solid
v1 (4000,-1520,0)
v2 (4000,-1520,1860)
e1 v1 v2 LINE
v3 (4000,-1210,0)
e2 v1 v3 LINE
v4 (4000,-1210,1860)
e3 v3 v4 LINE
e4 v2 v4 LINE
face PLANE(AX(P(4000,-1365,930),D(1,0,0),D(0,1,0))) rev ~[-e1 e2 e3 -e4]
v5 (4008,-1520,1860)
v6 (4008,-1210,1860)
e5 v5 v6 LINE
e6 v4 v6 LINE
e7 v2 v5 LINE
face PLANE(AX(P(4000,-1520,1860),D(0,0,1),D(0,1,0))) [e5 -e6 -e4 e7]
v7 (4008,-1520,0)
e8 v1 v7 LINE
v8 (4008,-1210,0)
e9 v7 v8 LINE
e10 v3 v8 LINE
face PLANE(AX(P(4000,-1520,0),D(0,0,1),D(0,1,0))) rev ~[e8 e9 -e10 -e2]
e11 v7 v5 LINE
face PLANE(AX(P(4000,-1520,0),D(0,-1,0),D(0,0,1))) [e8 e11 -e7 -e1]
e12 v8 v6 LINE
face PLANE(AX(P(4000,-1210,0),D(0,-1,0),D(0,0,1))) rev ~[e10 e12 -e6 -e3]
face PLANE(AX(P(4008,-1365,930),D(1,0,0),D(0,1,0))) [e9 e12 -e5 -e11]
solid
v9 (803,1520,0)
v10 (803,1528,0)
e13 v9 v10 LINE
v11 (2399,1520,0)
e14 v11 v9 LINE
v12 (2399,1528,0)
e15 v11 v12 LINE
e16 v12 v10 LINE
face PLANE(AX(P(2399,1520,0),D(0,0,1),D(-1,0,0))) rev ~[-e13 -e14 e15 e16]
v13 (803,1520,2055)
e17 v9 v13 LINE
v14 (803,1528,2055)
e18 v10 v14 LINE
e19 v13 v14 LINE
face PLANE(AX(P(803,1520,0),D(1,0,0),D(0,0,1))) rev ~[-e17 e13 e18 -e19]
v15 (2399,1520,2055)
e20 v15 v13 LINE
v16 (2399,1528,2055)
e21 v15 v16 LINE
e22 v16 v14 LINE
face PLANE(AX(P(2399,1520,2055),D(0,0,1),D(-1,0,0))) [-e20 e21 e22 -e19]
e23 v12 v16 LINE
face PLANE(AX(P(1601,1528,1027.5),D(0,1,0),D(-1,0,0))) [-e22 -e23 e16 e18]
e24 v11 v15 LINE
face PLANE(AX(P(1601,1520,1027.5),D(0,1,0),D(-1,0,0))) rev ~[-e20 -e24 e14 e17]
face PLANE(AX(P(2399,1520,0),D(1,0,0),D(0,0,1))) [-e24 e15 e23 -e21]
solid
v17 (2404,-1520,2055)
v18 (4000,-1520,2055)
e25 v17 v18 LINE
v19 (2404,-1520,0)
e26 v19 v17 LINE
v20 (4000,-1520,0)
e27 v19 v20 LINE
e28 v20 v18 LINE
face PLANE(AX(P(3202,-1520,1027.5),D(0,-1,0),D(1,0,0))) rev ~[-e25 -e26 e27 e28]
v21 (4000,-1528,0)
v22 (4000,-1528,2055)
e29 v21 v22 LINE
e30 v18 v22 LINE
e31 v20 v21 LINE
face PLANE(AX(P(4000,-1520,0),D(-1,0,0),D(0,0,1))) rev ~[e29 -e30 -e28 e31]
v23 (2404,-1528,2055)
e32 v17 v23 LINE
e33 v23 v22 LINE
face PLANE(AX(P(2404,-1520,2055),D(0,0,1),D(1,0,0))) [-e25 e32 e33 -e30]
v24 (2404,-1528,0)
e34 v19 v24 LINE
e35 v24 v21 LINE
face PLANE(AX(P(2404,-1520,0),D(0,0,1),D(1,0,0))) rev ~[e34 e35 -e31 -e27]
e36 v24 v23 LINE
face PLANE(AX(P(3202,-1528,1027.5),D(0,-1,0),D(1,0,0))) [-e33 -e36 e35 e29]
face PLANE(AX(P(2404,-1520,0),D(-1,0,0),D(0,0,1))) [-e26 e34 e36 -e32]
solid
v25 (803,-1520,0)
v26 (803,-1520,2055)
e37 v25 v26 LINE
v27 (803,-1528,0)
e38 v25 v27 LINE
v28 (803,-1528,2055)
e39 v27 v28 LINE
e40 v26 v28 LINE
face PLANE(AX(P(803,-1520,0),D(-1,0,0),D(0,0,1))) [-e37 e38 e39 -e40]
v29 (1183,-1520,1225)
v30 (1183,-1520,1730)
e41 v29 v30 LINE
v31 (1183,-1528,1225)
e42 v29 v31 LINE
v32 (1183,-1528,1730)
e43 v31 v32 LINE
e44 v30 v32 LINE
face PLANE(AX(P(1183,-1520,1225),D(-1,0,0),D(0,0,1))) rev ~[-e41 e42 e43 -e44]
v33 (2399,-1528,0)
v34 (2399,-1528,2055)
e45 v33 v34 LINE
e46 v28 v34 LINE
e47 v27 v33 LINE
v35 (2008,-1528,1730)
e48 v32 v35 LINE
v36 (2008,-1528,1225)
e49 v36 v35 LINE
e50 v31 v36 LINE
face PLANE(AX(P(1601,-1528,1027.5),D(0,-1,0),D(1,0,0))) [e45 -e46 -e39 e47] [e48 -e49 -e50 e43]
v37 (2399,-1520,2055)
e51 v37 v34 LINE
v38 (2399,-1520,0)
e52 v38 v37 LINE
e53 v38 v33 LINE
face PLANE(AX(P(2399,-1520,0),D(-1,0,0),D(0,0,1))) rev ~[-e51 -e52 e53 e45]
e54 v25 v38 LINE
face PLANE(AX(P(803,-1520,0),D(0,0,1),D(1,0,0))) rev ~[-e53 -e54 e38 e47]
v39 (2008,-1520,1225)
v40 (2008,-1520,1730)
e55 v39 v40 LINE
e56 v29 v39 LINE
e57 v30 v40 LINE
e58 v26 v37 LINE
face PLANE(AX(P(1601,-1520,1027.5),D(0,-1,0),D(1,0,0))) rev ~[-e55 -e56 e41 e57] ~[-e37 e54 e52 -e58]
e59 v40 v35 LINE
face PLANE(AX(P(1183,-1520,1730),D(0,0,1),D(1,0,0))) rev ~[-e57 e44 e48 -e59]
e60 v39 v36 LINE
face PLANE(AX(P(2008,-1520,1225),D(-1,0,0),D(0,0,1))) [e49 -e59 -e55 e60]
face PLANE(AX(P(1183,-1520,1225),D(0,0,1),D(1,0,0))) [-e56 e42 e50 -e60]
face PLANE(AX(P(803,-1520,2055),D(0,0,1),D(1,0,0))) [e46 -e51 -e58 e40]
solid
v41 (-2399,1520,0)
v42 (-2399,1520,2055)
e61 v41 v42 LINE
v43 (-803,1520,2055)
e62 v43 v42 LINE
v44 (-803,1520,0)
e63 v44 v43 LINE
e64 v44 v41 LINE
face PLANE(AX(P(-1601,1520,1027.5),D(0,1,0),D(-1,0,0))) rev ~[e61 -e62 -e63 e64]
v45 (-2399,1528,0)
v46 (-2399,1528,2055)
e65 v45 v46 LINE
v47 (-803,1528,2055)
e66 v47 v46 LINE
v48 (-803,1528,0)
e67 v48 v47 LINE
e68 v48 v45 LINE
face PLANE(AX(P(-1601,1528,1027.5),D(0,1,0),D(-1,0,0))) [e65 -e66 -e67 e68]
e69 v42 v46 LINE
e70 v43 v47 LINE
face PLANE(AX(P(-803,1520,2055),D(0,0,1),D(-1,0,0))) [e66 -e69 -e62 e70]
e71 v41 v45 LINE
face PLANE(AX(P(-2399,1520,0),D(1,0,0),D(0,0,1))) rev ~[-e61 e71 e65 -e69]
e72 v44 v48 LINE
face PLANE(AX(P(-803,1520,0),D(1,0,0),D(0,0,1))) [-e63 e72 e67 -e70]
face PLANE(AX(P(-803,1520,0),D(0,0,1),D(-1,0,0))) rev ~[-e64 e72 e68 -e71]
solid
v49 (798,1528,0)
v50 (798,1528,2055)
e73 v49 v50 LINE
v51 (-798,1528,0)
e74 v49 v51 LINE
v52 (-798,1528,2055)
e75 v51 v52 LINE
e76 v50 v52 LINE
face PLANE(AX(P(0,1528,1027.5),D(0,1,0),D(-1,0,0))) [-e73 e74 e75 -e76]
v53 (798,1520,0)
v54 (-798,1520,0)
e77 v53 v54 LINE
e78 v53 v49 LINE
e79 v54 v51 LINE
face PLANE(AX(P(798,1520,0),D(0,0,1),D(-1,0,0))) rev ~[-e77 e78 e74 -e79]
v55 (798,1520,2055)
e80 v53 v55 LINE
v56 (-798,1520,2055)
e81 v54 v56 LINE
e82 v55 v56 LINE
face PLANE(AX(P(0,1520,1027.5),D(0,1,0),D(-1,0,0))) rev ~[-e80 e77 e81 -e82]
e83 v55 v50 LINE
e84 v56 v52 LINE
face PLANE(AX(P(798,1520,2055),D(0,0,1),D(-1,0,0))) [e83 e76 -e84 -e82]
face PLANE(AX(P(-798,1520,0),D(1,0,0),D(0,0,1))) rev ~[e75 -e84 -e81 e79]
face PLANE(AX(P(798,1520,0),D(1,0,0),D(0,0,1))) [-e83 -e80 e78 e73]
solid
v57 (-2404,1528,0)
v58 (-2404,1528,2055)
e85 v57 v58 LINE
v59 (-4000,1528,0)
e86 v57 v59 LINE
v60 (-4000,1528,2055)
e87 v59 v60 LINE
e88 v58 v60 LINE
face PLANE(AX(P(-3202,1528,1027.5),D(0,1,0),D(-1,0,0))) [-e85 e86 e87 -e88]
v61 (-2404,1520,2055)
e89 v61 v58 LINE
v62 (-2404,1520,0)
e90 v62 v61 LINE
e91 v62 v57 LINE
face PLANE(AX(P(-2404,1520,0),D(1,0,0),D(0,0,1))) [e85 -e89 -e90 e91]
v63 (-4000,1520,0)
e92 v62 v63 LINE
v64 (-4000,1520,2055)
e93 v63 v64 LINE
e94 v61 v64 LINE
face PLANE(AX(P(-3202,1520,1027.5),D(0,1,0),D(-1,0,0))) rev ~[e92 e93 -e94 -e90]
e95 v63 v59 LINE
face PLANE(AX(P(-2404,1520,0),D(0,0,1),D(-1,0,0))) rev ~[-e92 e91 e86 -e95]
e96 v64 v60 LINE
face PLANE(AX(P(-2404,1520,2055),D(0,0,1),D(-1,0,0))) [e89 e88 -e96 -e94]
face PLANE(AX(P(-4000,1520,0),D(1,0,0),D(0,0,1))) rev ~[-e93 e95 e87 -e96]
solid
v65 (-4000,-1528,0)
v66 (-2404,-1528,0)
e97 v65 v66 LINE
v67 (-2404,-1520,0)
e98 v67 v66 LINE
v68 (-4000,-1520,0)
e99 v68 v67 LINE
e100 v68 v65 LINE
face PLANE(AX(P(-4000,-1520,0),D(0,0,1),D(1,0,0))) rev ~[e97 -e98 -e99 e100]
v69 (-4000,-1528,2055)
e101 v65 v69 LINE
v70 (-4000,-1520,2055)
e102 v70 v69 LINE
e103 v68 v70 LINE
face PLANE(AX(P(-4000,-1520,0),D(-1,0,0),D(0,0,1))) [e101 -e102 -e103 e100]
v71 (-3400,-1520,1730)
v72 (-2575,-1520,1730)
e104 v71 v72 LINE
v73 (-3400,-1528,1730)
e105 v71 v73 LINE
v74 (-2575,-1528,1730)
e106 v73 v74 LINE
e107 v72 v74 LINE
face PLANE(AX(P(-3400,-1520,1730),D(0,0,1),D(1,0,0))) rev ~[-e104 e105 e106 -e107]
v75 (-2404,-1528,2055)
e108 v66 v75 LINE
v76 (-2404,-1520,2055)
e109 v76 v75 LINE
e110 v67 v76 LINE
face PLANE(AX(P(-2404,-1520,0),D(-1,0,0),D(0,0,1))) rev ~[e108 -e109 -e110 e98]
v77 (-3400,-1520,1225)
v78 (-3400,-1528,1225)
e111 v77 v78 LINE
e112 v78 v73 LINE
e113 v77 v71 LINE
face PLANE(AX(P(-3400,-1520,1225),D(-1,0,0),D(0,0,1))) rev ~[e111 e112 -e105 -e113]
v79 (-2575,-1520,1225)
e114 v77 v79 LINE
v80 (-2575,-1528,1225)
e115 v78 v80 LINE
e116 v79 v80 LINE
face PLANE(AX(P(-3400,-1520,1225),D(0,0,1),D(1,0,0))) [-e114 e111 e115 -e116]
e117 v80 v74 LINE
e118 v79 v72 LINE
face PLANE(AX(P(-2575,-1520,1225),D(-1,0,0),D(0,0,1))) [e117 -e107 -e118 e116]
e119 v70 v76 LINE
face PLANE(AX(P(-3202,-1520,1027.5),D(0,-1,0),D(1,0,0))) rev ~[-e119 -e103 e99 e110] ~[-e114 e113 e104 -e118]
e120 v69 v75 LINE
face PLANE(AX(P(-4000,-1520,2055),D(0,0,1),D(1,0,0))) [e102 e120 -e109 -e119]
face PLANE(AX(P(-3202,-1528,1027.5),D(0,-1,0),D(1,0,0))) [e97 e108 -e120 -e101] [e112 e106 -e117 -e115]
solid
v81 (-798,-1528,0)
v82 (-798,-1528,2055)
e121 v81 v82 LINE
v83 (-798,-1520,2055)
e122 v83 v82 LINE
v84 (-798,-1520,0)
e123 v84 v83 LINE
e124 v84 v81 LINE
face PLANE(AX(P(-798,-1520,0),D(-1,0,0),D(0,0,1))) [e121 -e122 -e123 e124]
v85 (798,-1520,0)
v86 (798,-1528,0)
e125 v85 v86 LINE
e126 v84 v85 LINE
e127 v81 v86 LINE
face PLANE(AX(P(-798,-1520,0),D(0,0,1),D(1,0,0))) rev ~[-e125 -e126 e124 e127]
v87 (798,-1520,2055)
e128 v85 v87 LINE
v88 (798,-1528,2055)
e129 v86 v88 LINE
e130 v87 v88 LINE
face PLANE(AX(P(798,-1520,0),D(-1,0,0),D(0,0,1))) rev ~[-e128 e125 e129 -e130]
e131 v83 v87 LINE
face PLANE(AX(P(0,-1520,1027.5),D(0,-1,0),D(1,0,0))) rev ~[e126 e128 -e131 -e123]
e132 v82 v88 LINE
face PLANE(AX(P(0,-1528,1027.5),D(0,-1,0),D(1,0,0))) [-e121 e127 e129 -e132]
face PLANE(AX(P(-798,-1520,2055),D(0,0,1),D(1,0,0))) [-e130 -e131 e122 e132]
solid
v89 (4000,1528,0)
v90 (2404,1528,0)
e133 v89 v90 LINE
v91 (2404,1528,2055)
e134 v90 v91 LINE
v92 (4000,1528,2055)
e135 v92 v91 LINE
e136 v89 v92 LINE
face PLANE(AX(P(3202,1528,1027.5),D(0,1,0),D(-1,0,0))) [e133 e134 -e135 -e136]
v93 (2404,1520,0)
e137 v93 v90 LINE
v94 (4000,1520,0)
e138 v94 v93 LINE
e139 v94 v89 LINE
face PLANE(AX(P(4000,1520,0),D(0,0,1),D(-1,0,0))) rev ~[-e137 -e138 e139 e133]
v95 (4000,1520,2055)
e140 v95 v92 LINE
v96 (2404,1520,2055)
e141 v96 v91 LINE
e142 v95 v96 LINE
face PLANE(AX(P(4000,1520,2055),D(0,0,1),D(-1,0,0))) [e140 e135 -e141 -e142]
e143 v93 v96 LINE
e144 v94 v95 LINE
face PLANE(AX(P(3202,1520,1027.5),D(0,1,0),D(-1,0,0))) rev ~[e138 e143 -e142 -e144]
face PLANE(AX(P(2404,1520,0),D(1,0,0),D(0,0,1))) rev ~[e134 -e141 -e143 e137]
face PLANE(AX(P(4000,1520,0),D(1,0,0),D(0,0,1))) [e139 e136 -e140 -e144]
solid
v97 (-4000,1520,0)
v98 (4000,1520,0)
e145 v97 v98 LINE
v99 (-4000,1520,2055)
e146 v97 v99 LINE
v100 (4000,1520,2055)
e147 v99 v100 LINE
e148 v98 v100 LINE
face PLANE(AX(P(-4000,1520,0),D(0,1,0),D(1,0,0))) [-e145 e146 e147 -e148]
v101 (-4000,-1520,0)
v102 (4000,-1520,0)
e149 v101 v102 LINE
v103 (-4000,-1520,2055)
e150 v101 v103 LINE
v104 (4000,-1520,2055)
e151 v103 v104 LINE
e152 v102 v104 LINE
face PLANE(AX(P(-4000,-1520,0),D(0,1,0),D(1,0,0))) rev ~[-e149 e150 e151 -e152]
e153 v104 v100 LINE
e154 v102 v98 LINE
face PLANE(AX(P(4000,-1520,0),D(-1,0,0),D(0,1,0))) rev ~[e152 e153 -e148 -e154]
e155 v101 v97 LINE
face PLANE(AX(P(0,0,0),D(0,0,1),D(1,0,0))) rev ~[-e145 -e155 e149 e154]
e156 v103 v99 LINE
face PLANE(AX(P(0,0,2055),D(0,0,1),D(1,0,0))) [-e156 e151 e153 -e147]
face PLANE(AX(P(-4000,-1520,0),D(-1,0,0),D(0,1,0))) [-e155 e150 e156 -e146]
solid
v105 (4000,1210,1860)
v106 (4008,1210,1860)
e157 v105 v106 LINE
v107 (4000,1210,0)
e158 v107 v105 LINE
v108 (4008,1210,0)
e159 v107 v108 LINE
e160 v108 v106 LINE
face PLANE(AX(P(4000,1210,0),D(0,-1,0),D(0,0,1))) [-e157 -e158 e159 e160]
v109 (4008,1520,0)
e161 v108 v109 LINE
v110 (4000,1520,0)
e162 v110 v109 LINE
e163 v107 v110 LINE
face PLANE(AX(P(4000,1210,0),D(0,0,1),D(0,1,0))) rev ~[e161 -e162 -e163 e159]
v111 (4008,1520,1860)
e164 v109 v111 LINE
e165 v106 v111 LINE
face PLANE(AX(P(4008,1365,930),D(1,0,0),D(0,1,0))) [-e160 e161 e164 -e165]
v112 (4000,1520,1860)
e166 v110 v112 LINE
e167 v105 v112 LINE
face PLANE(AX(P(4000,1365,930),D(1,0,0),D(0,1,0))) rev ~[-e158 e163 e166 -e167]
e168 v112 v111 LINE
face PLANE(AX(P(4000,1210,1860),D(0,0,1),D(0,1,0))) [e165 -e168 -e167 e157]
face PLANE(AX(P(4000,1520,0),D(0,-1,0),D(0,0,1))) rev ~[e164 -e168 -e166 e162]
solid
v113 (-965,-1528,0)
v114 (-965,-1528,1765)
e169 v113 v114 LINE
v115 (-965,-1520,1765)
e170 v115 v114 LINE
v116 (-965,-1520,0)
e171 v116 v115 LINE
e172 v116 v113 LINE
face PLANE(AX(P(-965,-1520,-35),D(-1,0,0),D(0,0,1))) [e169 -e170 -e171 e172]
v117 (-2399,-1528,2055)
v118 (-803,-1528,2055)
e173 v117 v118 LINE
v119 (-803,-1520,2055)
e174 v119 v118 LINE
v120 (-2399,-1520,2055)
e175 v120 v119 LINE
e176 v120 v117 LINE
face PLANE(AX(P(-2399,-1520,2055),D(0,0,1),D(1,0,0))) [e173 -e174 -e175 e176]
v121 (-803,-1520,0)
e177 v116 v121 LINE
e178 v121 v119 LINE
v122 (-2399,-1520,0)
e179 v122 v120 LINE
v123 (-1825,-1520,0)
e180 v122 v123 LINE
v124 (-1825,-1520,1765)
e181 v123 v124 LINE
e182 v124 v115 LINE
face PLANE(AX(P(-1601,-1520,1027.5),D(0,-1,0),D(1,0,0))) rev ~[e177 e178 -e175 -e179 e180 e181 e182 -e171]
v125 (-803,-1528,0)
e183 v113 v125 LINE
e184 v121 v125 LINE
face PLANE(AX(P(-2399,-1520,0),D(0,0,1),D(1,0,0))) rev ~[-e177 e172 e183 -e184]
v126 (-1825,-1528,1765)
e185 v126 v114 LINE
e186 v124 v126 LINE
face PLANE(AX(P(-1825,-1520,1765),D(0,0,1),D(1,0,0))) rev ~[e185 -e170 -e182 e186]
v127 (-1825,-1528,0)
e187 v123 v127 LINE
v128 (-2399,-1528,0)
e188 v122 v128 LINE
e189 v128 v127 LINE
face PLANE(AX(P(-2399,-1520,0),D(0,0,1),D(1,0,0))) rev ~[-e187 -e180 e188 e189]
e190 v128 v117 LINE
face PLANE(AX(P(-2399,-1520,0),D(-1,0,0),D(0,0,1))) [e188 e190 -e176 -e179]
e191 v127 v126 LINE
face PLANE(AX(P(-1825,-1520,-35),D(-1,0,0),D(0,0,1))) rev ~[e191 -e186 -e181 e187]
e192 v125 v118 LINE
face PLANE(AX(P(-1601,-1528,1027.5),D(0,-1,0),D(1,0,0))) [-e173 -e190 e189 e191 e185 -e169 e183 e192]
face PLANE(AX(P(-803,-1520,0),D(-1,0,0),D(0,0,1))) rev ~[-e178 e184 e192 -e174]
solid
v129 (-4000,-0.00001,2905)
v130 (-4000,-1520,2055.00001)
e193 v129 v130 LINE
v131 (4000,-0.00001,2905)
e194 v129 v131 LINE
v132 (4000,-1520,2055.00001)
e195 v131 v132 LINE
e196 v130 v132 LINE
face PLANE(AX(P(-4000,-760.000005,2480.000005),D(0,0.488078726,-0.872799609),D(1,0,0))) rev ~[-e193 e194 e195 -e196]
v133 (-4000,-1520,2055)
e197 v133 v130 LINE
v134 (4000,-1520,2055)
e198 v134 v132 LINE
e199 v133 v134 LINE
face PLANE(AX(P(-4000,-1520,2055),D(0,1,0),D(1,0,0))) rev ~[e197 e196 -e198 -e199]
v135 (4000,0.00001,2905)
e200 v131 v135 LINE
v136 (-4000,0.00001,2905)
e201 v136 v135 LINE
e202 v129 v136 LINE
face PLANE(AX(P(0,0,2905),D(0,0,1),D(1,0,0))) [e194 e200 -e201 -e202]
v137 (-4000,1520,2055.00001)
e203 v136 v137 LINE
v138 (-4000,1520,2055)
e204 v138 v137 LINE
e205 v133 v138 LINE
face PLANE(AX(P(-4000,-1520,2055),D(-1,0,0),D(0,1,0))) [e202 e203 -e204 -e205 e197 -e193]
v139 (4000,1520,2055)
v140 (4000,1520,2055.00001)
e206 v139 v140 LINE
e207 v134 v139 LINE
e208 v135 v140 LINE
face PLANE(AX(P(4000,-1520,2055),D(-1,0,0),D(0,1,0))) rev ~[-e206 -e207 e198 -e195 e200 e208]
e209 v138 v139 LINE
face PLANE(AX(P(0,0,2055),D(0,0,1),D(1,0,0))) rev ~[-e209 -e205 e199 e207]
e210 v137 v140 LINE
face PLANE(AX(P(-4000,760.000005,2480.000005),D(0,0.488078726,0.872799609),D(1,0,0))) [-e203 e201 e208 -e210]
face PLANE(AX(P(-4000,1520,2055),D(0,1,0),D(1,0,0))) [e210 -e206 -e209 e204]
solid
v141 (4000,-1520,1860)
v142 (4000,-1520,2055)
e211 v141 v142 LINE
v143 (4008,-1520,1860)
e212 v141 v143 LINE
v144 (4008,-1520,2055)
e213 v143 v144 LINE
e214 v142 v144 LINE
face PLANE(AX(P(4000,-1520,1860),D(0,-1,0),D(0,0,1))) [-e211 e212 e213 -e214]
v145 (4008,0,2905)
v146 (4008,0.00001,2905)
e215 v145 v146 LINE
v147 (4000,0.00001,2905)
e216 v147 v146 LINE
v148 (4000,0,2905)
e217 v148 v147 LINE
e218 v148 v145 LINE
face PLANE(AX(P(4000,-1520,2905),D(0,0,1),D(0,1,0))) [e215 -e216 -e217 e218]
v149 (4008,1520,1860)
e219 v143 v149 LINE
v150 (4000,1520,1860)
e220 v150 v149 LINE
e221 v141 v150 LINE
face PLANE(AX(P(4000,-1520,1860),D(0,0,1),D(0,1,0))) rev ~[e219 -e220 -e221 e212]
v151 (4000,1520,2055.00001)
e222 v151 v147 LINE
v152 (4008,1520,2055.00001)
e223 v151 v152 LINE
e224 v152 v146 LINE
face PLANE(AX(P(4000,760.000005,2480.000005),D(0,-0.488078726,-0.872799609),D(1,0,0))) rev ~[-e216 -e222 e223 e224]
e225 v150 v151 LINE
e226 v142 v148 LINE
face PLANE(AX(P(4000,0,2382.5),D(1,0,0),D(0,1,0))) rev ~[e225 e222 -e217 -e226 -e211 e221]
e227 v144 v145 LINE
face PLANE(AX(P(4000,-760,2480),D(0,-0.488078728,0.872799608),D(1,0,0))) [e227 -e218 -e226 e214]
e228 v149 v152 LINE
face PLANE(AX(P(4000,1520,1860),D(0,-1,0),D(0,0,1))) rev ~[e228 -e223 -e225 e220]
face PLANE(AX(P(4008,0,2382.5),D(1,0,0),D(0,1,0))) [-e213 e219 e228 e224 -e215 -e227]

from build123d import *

# Parameters (mm, degrees)
F0_W        = 8000
F0_H        = 3040
F1_DEPTH    = 2055
F2_W        = 1596
F2_H        = 2055
F3_DEPTH    = 8
F4_W        = 310
F4_H        = 1860
F5_DEPTH    = 8
F6_W        = 1596
F6_H        = 2055
F7_DEPTH    = 8
F8_W        = 825
F8_H        = 505
F8_W_2      = 860
F8_H_2      = 1800
F9_DEPTH    = 8
F10_DEPTH   = 850
F11_SIZE2   = 849.99999
F11_SIZE    = 1519.99999
F12_W       = 3040
F12_H       = 1045
F13_DEPTH   = 8
F14_SIZE2   = 1520
F14_SIZE    = 850
F14_2_SIZE2 = 1519.99999
F14_2_SIZE  = 849.99999


# Not quite as in the source:
# - a fillet or chamfer is up to 0.001 mm smaller than in the source, because OpenCascade refuses the exact size


with BuildPart() as f1:
    # F0 (on Top) → F1 (new body)
    with BuildSketch(Plane.XY):
        Rectangle(F0_W, F0_H)
    extrude(amount=F1_DEPTH)


with BuildPart() as f3:
    # F2 (on face) → F3 (new body)
    with BuildSketch(Plane.XZ.offset(1520)):
        with Locations((3202, 1027.5)):
            Rectangle(F2_W, F2_H)
    extrude(amount=F3_DEPTH)


with BuildPart() as f3b:
    # F2 (on face) → F3, piece 2 (new body)
    with BuildSketch(Plane.XZ.offset(1520)):
        with Locations((1601, 1027.5)):
            Rectangle(F2_W, F2_H)
    extrude(amount=F3_DEPTH)


with BuildPart() as f3c:
    # F2 (on face) → F3, piece 3 (new body)
    with BuildSketch(Plane.XZ.offset(1520)):
        with Locations((0, 1027.5)):
            Rectangle(F2_W, F2_H)
    extrude(amount=F3_DEPTH)


with BuildPart() as f3d:
    # F2 (on face) → F3, piece 4 (new body)
    with BuildSketch(Plane.XZ.offset(1520)):
        with Locations((-1601, 1027.5)):
            Rectangle(F2_W, F2_H)
    extrude(amount=F3_DEPTH)


with BuildPart() as f3e:
    # F2 (on face) → F3, piece 5 (new body)
    with BuildSketch(Plane.XZ.offset(1520)):
        with Locations((-3202, 1027.5)):
            Rectangle(F2_W, F2_H)
    extrude(amount=F3_DEPTH)


with BuildPart() as f5:
    # F4 (on face) → F5 (new body)
    with BuildSketch(Plane.YZ.offset(4000)):
        with Locations((-1365, 930)):
            Rectangle(F4_W, F4_H)
    extrude(amount=F5_DEPTH)


with BuildPart() as f5b:
    # F4 (on face) → F5, piece 2 (new body)
    with BuildSketch(Plane.YZ.offset(4000)):
        with Locations((1365, 930)):
            Rectangle(F4_W, F4_H)
    extrude(amount=F5_DEPTH)


with BuildPart() as f7:
    # F6 (on face) → F7 (new body)
    with BuildSketch(Plane(origin=(0, 1520, 0), x_dir=(-1, 0, 0), z_dir=(0, 1, 0))):
        with Locations((-3202, 1027.5)):
            Rectangle(F6_W, F6_H)
    extrude(amount=F7_DEPTH)


with BuildPart() as f7b:
    # F6 (on face) → F7, piece 2 (new body)
    with BuildSketch(Plane(origin=(0, 1520, 0), x_dir=(-1, 0, 0), z_dir=(0, 1, 0))):
        with Locations((-1601, 1027.5)):
            Rectangle(F6_W, F6_H)
    extrude(amount=F7_DEPTH)


with BuildPart() as f7c:
    # F6 (on face) → F7, piece 3 (new body)
    with BuildSketch(Plane(origin=(0, 1520, 0), x_dir=(-1, 0, 0), z_dir=(0, 1, 0))):
        with Locations((0, 1027.5)):
            Rectangle(F6_W, F6_H)
    extrude(amount=F7_DEPTH)


with BuildPart() as f7d:
    # F6 (on face) → F7, piece 4 (new body)
    with BuildSketch(Plane(origin=(0, 1520, 0), x_dir=(-1, 0, 0), z_dir=(0, 1, 0))):
        with Locations((1601, 1027.5)):
            Rectangle(F6_W, F6_H)
    extrude(amount=F7_DEPTH)


with BuildPart() as f7e:
    # F6 (on face) → F7, piece 5 (new body)
    with BuildSketch(Plane(origin=(0, 1520, 0), x_dir=(-1, 0, 0), z_dir=(0, 1, 0))):
        with Locations((3202, 1027.5)):
            Rectangle(F6_W, F6_H)
    extrude(amount=F7_DEPTH)


with BuildPart() as f9_tool:
    # F8 (on face) → F9 (new body)
    with BuildSketch(Plane.XZ.offset(1520)):
        with Locations((1595.5, 1477.5)):
            Rectangle(F8_W, F8_H)
        with Locations((-2987.5, 1477.5)):
            Rectangle(F8_W, F8_H)
        with Locations((-1395, 865)):
            Rectangle(F8_W_2, F8_H_2)
    extrude(amount=F9_DEPTH)


with BuildPart() as f3b_1:
    add(f3b.part)

    # F9: cut by f9_tool
    add(f9_tool.part, mode=Mode.SUBTRACT)


with BuildPart() as f3d_1:
    add(f3d.part)

    # F9: cut by f9_tool
    add(f9_tool.part, mode=Mode.SUBTRACT)


with BuildPart() as f3e_1:
    add(f3e.part)

    # F9: cut by f9_tool
    add(f9_tool.part, mode=Mode.SUBTRACT)


with BuildPart() as f10:
    # F10 (new): a face of the model
    f10_faces = [f1.part.faces().sort_by_distance(p)[0] for p in [
        (0, 0, 2055),
    ]]
    extrude(f10_faces, amount=F10_DEPTH)

    # F11 (size 1520 and 850 in the source; OpenCascade refuses exactly that, so slightly less here)
    f11_edges = [f10.edges().sort_by_distance(p)[0] for p in [
        (0, -1520, 2905),
        (0, 1520, 2905),
    ]]
    f11_side = f10.faces().sort_by_distance((0, 0, 2905))[0]
    chamfer(f11_edges, length=F11_SIZE, length2=F11_SIZE2, reference=f11_side)


with BuildPart() as f13:
    # F12 (on face) → F13 (new body)
    with BuildSketch(Plane.YZ.offset(4000)):
        with Locations((0, 2382.5)):
            Rectangle(F12_W, F12_H)
    extrude(amount=F13_DEPTH)

    # F14
    f14_edges = [f13.edges().sort_by_distance(p)[0] for p in [
        (4004, -1520, 2905),
    ]]
    f14_side = f13.faces().sort_by_distance((4004, -1520, 2382.5))[0]
    chamfer(f14_edges, length=F14_SIZE, length2=F14_SIZE2, reference=f14_side)

    # F14#2 (size 850 and 1520 in the source; OpenCascade refuses exactly that, so slightly less here)
    f14_2_edges = [f13.edges().sort_by_distance(p)[0] for p in [
        (4004, 1520, 2905),
    ]]
    f14_2_side = f13.faces().sort_by_distance((4004, 1520, 2382.5))[0]
    chamfer(f14_2_edges, length=F14_2_SIZE, length2=F14_2_SIZE2, reference=f14_2_side)


solid = Compound([f1.part, f3.part, f3c.part, f5.part, f5b.part, f7.part, f7b.part, f7c.part, f7d.part, f7e.part, f3b_1.part, f3d_1.part, f3e_1.part, f10.part, f13.part])
